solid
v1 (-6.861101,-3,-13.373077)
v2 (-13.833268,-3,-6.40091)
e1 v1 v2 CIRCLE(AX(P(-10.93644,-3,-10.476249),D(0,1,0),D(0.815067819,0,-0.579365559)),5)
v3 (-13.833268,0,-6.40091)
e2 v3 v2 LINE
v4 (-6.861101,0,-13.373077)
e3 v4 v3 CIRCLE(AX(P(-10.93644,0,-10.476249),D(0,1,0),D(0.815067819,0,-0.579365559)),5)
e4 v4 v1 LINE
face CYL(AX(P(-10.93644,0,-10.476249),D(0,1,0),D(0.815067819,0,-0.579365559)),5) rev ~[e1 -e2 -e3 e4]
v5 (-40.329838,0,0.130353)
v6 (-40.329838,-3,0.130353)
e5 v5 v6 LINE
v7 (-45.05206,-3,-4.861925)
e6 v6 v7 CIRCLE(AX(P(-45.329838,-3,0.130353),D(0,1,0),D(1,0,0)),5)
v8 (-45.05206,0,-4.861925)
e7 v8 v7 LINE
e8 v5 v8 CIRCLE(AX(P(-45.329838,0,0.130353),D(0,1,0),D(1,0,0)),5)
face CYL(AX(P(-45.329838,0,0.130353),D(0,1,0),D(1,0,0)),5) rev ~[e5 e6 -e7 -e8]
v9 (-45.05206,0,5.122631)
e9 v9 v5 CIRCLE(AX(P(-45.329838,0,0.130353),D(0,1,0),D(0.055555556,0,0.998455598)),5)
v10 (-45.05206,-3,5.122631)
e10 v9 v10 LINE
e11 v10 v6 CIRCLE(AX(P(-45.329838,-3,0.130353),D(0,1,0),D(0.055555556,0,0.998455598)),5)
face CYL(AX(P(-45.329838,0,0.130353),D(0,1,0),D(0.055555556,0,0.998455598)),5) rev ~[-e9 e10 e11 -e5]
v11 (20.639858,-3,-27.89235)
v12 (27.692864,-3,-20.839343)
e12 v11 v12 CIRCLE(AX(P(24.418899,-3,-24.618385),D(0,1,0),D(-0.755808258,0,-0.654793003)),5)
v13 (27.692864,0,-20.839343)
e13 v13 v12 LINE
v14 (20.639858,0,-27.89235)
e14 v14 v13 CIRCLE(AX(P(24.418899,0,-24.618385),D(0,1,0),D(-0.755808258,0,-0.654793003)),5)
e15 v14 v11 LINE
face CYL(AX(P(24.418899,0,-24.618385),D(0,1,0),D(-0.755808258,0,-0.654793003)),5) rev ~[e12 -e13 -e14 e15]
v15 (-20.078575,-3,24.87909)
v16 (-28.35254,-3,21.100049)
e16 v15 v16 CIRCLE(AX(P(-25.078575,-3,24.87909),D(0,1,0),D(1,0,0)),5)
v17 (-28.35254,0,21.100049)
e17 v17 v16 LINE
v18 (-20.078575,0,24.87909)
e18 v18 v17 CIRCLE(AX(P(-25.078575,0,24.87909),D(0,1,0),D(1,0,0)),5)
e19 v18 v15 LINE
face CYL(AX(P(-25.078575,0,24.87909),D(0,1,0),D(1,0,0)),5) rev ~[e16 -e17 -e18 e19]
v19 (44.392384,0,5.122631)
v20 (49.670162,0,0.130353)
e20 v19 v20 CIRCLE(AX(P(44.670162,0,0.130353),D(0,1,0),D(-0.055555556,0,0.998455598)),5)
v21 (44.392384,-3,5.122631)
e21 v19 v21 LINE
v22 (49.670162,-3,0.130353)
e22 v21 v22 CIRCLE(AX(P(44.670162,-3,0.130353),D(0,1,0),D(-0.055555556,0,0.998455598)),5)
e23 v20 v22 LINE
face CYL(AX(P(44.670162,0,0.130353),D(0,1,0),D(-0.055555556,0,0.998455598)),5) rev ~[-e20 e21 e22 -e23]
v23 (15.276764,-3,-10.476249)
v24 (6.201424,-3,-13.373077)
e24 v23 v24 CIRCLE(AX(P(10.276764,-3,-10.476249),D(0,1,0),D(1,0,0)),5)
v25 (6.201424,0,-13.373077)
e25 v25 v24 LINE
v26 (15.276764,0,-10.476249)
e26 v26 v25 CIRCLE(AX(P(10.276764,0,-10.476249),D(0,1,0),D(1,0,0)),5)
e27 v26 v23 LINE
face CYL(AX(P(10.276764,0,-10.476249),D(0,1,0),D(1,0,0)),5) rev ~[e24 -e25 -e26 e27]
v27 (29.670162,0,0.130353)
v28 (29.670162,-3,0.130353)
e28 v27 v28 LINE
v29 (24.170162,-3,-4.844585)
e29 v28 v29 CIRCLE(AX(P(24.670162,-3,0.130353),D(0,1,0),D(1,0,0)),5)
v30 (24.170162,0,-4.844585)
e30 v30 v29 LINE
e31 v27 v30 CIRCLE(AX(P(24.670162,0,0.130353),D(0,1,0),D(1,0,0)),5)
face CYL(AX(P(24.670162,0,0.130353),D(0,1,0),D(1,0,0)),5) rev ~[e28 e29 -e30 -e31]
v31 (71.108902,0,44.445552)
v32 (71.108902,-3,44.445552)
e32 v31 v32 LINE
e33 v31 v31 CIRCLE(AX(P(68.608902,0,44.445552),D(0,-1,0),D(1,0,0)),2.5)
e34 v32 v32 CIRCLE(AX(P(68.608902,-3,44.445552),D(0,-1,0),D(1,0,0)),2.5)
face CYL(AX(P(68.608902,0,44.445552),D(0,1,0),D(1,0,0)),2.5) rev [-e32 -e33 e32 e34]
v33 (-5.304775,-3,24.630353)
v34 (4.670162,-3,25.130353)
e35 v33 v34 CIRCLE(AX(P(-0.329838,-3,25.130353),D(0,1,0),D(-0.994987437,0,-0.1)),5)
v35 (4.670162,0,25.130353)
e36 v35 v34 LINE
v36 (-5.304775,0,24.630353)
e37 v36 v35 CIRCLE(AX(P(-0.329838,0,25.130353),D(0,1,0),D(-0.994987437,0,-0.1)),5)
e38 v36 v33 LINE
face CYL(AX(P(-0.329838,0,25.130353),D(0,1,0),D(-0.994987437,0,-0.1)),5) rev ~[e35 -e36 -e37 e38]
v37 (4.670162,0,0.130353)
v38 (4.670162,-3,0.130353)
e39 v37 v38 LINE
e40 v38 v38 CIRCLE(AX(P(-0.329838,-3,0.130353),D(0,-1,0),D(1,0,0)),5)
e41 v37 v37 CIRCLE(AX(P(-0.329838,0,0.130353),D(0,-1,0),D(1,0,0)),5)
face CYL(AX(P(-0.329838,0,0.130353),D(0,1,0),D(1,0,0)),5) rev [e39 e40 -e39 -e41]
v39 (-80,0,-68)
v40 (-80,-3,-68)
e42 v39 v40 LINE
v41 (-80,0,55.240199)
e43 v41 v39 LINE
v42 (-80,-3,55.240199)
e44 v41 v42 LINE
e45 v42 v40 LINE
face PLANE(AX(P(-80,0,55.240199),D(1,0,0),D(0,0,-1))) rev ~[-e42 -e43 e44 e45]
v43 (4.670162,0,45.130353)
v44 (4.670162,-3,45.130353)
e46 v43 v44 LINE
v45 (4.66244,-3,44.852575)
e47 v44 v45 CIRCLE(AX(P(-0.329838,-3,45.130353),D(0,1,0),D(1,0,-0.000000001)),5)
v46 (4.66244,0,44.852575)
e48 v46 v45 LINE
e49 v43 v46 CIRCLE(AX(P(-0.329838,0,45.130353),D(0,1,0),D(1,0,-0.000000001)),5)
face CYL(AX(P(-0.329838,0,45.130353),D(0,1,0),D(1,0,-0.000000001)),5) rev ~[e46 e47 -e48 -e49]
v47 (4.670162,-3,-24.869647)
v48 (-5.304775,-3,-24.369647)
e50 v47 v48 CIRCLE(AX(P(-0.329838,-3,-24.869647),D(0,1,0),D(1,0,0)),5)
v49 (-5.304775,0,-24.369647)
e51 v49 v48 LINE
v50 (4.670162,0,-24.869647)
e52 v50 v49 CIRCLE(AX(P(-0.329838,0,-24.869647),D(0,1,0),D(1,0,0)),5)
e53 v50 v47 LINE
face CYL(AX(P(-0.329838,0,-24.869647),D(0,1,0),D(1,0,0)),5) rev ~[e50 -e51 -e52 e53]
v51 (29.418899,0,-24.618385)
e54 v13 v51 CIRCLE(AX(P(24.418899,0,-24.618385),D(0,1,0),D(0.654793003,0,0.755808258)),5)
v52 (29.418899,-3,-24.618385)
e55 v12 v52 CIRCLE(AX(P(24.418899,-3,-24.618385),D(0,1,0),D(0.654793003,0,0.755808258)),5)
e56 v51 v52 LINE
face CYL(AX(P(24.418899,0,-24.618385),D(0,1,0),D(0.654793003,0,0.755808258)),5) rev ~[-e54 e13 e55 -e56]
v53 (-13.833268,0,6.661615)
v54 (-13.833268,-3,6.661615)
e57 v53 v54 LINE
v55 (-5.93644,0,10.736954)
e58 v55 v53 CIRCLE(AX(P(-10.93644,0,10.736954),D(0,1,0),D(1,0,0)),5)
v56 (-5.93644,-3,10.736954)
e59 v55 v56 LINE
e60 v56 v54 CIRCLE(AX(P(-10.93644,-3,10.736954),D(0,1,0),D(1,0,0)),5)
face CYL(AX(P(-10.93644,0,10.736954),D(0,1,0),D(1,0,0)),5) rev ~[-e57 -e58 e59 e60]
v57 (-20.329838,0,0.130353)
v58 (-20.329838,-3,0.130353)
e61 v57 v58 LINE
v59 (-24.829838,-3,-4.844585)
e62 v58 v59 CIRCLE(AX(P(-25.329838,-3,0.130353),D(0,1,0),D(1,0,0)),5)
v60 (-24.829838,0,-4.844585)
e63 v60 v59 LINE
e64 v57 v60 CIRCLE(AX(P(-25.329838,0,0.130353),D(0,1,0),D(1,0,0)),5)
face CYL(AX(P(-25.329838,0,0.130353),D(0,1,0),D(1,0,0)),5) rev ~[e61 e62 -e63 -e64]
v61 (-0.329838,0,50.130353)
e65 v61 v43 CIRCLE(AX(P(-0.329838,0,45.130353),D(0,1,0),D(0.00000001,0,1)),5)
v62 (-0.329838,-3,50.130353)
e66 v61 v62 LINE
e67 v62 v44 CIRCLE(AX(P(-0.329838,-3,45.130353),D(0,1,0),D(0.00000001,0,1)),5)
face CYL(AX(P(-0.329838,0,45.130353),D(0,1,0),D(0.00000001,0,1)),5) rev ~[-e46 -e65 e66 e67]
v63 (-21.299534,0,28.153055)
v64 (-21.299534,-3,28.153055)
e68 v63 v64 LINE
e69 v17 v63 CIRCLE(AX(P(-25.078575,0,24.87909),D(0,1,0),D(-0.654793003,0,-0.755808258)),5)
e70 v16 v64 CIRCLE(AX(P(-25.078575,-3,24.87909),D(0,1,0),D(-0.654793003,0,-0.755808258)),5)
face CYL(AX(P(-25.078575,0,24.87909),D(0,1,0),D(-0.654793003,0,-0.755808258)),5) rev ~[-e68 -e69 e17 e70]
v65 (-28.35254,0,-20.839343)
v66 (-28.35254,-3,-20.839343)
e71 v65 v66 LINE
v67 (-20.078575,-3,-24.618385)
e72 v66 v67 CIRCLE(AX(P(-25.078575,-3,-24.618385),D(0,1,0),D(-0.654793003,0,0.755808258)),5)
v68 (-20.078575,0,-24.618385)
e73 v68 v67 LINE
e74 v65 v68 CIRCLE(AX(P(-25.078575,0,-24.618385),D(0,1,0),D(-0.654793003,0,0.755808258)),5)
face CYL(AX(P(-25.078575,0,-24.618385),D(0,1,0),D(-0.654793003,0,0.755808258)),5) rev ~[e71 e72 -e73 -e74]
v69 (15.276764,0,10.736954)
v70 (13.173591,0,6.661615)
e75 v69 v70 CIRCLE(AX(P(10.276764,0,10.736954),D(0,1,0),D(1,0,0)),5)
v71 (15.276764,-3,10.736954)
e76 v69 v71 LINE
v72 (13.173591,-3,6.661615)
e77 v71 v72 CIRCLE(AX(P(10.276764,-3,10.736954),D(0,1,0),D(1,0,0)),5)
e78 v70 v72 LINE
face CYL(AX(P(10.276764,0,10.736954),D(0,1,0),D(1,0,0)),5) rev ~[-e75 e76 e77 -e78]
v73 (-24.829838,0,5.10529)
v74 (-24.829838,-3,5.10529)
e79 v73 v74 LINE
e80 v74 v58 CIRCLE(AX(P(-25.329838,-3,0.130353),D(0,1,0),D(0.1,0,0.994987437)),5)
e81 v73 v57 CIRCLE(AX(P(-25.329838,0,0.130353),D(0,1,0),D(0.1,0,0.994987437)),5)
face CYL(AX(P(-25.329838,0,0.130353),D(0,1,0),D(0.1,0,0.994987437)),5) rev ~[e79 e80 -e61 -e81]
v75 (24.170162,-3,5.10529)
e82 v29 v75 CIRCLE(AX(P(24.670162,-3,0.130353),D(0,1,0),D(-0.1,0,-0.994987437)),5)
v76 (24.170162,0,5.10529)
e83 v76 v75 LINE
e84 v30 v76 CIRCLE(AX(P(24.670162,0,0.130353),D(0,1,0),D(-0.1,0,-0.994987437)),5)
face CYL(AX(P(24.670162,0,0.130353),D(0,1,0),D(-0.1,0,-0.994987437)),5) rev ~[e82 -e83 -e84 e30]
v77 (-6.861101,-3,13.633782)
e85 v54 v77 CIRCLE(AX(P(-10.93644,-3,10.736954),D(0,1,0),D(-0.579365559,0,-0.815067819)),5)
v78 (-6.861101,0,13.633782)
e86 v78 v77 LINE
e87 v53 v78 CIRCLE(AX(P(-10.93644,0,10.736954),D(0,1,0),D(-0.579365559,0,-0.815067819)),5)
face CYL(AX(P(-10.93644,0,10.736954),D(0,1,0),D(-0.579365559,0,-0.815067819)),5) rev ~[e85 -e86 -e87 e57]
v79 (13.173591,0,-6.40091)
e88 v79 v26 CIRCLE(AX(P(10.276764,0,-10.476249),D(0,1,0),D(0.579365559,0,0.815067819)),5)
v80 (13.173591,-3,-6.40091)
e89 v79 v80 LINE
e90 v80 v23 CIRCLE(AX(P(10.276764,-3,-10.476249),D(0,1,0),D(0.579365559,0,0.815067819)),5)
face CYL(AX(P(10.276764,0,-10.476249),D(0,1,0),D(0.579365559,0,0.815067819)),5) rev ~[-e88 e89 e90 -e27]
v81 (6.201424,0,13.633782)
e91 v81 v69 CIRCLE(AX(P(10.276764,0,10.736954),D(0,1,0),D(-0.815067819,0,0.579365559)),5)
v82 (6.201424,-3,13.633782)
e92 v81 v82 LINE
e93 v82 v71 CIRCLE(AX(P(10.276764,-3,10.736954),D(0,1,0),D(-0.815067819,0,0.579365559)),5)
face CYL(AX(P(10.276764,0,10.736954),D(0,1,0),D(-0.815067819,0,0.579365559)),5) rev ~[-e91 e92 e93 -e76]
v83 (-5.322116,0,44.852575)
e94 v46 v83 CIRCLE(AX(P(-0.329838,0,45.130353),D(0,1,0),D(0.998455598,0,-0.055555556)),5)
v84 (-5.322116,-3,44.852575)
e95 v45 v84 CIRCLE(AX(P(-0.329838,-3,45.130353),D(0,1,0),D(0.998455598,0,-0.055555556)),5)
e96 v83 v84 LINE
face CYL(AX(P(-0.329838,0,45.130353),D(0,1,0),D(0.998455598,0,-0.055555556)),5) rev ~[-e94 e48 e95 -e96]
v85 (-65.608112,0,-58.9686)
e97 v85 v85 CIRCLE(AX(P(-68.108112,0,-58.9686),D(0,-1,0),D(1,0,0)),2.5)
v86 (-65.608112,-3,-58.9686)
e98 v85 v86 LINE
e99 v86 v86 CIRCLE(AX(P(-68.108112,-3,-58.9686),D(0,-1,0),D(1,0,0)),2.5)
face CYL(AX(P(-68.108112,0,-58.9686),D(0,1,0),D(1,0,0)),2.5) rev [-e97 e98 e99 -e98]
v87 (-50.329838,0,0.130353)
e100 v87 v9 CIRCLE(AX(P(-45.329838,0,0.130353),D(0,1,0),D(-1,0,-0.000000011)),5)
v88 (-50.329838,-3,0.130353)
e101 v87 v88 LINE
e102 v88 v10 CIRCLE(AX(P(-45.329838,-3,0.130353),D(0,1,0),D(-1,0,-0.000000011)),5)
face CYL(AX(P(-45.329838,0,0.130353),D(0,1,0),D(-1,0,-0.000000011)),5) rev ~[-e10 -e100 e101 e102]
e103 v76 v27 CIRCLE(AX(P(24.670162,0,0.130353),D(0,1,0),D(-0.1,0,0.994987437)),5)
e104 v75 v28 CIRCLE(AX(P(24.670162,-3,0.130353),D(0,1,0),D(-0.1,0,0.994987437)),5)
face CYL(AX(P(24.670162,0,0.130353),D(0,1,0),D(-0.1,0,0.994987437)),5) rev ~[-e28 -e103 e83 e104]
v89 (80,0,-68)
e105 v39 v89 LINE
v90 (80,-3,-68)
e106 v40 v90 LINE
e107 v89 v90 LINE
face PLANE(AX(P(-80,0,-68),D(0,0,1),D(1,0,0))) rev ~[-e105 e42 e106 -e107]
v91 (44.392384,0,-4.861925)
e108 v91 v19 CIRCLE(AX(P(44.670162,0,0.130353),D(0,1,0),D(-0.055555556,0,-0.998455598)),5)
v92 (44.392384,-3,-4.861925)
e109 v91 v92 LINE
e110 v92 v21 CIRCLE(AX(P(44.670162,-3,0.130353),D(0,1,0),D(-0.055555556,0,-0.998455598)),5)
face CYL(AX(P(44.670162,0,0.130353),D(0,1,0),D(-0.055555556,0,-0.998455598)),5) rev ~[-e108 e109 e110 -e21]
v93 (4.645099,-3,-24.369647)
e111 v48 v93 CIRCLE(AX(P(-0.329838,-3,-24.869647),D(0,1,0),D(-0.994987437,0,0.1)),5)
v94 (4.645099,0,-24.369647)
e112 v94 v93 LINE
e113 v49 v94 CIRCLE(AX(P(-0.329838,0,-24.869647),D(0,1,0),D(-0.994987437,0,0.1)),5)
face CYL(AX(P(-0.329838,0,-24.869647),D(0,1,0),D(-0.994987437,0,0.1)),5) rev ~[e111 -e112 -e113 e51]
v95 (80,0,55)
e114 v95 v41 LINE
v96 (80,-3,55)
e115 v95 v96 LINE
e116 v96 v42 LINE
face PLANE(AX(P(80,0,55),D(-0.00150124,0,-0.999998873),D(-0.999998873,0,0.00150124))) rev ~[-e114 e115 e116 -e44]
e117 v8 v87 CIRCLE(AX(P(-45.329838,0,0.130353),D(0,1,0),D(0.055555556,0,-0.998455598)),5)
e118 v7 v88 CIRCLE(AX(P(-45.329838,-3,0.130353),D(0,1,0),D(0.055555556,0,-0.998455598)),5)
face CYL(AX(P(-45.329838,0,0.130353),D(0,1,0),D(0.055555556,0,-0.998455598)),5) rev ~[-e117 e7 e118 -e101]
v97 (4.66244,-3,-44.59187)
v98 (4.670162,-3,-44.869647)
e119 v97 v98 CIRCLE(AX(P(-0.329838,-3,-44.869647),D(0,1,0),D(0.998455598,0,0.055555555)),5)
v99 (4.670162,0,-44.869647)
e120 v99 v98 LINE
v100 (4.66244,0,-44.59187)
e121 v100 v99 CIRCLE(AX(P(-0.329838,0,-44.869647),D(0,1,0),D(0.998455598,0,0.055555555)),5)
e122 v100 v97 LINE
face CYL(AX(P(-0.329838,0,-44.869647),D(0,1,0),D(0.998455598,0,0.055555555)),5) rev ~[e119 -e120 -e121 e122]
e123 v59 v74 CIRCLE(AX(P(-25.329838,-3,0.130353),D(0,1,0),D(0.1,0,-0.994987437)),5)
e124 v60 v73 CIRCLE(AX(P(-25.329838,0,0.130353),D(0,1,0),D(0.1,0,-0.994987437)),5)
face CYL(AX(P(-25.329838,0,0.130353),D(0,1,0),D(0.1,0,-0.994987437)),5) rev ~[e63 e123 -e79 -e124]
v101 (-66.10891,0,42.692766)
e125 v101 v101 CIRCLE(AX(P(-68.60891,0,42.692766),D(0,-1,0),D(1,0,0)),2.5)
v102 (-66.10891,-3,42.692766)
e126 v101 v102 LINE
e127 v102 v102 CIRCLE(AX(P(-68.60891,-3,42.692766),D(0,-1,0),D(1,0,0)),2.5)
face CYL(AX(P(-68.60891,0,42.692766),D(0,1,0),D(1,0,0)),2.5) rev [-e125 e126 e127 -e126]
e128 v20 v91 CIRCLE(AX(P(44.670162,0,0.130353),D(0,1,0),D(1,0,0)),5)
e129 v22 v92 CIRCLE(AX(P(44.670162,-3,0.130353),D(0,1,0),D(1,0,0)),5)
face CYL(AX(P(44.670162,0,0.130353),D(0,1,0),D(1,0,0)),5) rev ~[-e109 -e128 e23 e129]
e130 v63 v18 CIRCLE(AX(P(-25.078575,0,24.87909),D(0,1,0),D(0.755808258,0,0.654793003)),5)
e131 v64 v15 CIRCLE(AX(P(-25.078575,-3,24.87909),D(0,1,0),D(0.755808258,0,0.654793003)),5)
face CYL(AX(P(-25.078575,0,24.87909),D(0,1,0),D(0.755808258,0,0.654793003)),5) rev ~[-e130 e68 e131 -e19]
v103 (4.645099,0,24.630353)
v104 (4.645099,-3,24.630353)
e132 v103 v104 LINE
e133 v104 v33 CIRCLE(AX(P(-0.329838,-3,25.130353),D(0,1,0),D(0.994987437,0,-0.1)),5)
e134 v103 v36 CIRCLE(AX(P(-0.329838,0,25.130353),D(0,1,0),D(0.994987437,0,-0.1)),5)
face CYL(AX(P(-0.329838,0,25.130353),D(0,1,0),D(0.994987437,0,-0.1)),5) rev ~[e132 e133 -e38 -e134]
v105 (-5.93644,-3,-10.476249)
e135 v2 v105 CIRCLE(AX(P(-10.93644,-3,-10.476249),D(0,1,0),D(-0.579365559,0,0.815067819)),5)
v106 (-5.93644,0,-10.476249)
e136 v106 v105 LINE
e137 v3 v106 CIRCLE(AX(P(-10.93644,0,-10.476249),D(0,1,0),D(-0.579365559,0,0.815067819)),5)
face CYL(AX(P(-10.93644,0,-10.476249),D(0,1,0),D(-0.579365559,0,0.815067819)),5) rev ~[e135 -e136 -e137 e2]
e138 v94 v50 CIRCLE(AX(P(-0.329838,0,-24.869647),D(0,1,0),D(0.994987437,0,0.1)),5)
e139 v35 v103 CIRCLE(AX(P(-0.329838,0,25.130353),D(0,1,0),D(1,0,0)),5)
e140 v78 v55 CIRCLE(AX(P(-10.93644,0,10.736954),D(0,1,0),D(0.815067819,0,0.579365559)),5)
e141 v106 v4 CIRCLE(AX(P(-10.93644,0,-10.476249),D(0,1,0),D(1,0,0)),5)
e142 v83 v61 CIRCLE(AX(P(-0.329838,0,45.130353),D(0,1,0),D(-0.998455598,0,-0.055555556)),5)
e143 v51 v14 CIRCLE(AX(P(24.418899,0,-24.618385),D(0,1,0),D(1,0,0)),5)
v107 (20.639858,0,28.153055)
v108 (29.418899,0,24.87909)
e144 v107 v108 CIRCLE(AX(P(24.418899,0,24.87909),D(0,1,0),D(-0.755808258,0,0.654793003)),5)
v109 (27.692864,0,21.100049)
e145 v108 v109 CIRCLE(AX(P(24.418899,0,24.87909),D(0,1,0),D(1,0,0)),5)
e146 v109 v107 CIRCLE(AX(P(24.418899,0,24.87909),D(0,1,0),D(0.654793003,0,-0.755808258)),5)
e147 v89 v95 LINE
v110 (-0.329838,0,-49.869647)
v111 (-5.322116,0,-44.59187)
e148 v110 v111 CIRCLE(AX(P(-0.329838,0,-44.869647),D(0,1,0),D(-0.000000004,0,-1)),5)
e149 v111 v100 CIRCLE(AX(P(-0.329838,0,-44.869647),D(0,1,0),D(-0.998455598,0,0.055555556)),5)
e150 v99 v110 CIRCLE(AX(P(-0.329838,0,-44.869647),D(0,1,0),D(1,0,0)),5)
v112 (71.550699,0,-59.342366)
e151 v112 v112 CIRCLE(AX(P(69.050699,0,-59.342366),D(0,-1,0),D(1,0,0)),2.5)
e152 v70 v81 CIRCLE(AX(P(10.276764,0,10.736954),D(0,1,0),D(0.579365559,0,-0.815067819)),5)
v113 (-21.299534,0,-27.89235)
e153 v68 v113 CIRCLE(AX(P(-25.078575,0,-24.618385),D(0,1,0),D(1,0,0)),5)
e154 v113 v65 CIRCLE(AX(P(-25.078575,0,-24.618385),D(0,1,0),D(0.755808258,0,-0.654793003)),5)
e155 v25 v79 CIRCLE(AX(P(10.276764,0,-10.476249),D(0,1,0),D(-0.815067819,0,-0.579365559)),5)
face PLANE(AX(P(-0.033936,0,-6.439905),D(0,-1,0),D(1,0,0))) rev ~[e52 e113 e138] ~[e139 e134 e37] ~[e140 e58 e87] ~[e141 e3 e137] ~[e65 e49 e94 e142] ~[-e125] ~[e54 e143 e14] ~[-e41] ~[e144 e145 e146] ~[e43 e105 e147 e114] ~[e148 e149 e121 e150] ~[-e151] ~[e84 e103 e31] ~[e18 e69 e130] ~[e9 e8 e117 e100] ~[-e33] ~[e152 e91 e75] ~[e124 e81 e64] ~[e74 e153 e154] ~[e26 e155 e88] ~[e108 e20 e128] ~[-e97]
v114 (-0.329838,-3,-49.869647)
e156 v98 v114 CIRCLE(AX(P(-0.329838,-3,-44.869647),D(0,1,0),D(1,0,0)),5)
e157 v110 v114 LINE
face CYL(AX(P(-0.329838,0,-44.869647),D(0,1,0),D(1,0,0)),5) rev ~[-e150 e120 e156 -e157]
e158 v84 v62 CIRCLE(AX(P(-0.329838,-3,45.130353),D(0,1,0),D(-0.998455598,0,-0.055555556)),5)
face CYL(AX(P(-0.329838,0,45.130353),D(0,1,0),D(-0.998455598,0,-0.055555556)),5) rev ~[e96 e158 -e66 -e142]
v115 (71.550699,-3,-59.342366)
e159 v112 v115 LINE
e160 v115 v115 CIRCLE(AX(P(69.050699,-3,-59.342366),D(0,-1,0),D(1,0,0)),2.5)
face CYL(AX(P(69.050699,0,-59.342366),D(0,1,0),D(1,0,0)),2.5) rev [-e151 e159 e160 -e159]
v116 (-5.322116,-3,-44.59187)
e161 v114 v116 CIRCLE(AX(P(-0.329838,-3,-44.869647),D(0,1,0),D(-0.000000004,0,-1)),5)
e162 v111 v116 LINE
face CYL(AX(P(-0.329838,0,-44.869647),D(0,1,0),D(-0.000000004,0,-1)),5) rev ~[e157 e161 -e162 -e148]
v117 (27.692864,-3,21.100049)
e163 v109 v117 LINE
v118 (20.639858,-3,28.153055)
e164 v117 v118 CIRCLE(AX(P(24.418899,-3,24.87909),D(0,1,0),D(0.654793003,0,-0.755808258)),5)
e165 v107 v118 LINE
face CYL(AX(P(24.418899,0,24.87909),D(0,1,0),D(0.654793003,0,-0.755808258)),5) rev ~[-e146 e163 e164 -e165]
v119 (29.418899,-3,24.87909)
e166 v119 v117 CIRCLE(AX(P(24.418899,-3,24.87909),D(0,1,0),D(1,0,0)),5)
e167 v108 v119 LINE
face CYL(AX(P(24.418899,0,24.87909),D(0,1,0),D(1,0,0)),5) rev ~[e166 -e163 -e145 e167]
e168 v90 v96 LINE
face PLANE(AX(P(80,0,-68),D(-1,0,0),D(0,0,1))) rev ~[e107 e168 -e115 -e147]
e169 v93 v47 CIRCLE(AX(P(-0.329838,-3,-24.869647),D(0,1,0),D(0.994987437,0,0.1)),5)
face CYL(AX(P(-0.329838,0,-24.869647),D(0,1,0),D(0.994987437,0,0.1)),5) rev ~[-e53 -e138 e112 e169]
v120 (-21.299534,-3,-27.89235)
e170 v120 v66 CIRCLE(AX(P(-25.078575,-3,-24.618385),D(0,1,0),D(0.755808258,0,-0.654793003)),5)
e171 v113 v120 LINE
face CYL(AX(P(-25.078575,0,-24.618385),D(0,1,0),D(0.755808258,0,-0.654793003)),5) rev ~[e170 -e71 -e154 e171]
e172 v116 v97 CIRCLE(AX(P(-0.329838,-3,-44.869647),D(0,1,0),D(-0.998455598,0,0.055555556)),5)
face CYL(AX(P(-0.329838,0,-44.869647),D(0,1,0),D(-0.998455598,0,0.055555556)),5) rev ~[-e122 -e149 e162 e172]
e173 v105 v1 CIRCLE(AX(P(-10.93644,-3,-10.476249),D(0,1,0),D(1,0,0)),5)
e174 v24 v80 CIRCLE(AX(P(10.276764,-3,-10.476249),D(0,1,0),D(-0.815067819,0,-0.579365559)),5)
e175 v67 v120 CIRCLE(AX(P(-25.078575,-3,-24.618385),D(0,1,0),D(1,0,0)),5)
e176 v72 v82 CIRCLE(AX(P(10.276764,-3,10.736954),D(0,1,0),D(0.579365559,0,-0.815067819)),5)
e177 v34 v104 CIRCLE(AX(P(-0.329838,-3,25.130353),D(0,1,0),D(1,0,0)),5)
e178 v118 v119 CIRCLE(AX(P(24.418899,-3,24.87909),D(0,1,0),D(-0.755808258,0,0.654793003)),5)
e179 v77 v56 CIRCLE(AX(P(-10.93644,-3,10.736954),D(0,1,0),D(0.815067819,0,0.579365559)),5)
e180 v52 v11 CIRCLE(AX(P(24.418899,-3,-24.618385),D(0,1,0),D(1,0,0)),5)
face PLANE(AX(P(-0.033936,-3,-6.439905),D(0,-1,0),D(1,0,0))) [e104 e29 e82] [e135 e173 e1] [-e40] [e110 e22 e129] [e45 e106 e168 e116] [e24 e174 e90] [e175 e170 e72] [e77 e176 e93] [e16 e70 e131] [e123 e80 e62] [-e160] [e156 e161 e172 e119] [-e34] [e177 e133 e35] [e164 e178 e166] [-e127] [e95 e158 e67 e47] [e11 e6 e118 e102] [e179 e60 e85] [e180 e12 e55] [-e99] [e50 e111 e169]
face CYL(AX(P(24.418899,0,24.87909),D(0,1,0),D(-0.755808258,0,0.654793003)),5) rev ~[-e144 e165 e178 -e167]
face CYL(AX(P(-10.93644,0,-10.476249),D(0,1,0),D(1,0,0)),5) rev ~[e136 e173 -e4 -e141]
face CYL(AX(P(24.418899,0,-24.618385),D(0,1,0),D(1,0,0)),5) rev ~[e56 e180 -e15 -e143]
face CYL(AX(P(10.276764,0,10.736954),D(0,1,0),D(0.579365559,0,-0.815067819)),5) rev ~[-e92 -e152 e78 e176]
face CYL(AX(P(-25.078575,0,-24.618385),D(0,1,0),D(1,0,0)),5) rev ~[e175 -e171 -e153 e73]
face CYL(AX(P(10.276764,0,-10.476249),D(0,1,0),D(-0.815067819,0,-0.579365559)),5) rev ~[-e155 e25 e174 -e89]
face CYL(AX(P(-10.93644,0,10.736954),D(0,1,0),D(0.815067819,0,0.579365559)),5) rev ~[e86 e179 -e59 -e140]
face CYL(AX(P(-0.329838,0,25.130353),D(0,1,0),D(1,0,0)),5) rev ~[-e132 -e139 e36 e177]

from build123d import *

# Parameters (mm, degrees)
F0_R     = 2.5
F0_R_2   = 5
F1_DEPTH = 3


with BuildPart() as f1:
    # F0 (on Front) → F1 (new body)
    with BuildSketch(Plane.XZ):
        Polygon((0, -68), (80, -68), (80, 55), (-80, 55.240198642), (-80, -68), align=None)
        with Locations((-68.1081116199, -58.9685998857)):
            Circle(F0_R, mode=Mode.SUBTRACT)
        with Locations((69.0506994724, -59.3423657119)):
            Circle(F0_R, mode=Mode.SUBTRACT)
        Polygon((49.6701618657, 0.1303526806), (49.6701618657, -49.8696473194), (-0.3298381532, -49.8696473194), (-50.3298381343, -49.8696473194), (-50.3298381343, 0.130352625), (-50.3298381343, 50.1303526806), (-0.3298380849, 50.1303526806), (49.6701618657, 50.1303526806), align=None, mode=Mode.SUBTRACT)
        with Locations((-68.6089098454, 42.6927655935)):
            Circle(F0_R, mode=Mode.SUBTRACT)
        with Locations((68.6089023948, 44.4455519319)):
            Circle(F0_R, mode=Mode.SUBTRACT)
        with BuildLine():
            ThreePointArc((-45.0520603566, -4.8619253071), (-32.1496432877, -31.6894524728), (-5.322116122, -44.5918695417))
            ThreePointArc((-5.322116122, -44.5918695417), (-0.3298381343, -39.8696473194), (4.6624398533, -44.5918695417))
            ThreePointArc((4.6624398533, -44.5918695417), (31.489967019, -31.6894524728), (44.3923840879, -4.8619253071))
            ThreePointArc((44.3923840879, -4.8619253071), (39.6701618657, 0.1303526806), (44.3923840879, 5.1226306682))
            ThreePointArc((44.3923840879, 5.1226306682), (31.489967019, 31.950157834), (4.6624398533, 44.8525749028))
            ThreePointArc((4.6624398533, 44.8525749028), (-0.3298381343, 40.1303526806), (-5.322116122, 44.8525749028))
            ThreePointArc((-5.322116122, 44.8525749028), (-32.1496432877, 31.950157834), (-45.0520603566, 5.1226306682))
            ThreePointArc((-45.0520603566, 5.1226306682), (-41.6974223481, 3.5662740353), (-40.3298381343, 0.1303526806))
            ThreePointArc((-40.3298381343, 0.1303526806), (-41.6974223481, -3.3055686741), (-45.0520603566, -4.8619253071))
        make_face()
        with BuildLine():
            ThreePointArc((27.6928642243, 21.1000487327), (32.8800593553, 11.1803621251), (34.6701618657, 0.1303526806))
            ThreePointArc((34.6701618657, 0.1303526806), (32.8800593553, -10.9196567639), (27.6928642243, -20.8393433716))
            ThreePointArc((27.6928642243, -20.8393433716), (28.9669661089, -22.5411058021), (29.4188992072, -24.618384661))
            ThreePointArc((29.4188992072, -24.618384661), (26.1660101872, -29.303211576), (20.6398579178, -27.8923496781))
            ThreePointArc((20.6398579178, -27.8923496781), (-0.3298381343, -34.8696473194), (-21.2995341865, -27.8923496781))
            ThreePointArc((-21.2995341865, -27.8923496781), (-28.6141093818, -28.1539185669), (-28.352540493, -20.8393433716))
            ThreePointArc((-28.352540493, -20.8393433716), (-35.3298381343, 0.1303526806), (-28.352540493, 21.1000487327))
            ThreePointArc((-28.352540493, 21.1000487327), (-28.6141093818, 28.414623928), (-21.2995341865, 28.1530550392))
            ThreePointArc((-21.2995341865, 28.1530550392), (-0.3298381343, 35.1303526806), (20.6398579178, 28.1530550392))
            ThreePointArc((20.6398579178, 28.1530550392), (26.1660101872, 29.5639169371), (29.4188992072, 24.8790900221))
            ThreePointArc((29.4188992072, 24.8790900221), (28.9669661089, 22.8018111633), (27.6928642243, 21.1000487327))
        make_face(mode=Mode.SUBTRACT)
        with BuildLine():
            ThreePointArc((27.6928642243, -20.8393433716), (32.8800593553, -10.9196567639), (34.6701618657, 0.1303526806))
            ThreePointArc((34.6701618657, 0.1303526806), (32.8800593553, 11.1803621251), (27.6928642243, 21.1000487327))
            ThreePointArc((27.6928642243, 21.1000487327), (20.8833653012, 21.3435561162), (20.6398579178, 28.1530550392))
            ThreePointArc((20.6398579178, 28.1530550392), (-0.3298381343, 35.1303526806), (-21.2995341865, 28.1530550392))
            ThreePointArc((-21.2995341865, 28.1530550392), (-20.3937485609, 26.6262010021), (-20.0785754759, 24.8790900221))
            ThreePointArc((-20.0785754759, 24.8790900221), (-23.0012966171, 20.3310231204), (-28.352540493, 21.1000487327))
            ThreePointArc((-28.352540493, 21.1000487327), (-35.3298381343, 0.1303526806), (-28.352540493, -20.8393433716))
            ThreePointArc((-28.352540493, -20.8393433716), (-23.0012966171, -20.0703177592), (-20.0785754759, -24.618384661))
            ThreePointArc((-20.0785754759, -24.618384661), (-20.3937485609, -26.365495641), (-21.2995341865, -27.8923496781))
            ThreePointArc((-21.2995341865, -27.8923496781), (-0.3298381343, -34.8696473194), (20.6398579178, -27.8923496781))
            ThreePointArc((20.6398579178, -27.8923496781), (20.8833653012, -21.082850755), (27.6928642243, -20.8393433716))
        make_face()
        with BuildLine():
            ThreePointArc((4.6450990512, 24.6303526806), (17.3478313953, 17.8080222102), (24.1701618657, 5.1052898661))
            ThreePointArc((24.1701618657, 5.1052898661), (28.0242638319, 3.8384519241), (29.6701618657, 0.1303526806))
            ThreePointArc((29.6701618657, 0.1303526806), (28.0242638319, -3.577746563), (24.1701618657, -4.844584505))
            ThreePointArc((24.1701618657, -4.844584505), (17.3478313953, -17.5473168491), (4.6450990512, -24.3696473194))
            ThreePointArc((4.6450990512, -24.3696473194), (4.6638922312, -24.6193334441), (4.6701618657, -24.8696473194))
            ThreePointArc((4.6701618657, -24.8696473194), (-0.5801520096, -29.863377685), (-5.3047753199, -24.3696473194))
            ThreePointArc((-5.3047753199, -24.3696473194), (-18.007507664, -17.5473168491), (-24.8298381343, -4.844584505))
            ThreePointArc((-24.8298381343, -4.844584505), (-30.3298381343, 0.1303526806), (-24.8298381343, 5.1052898661))
            ThreePointArc((-24.8298381343, 5.1052898661), (-18.007507664, 17.8080222102), (-5.3047753199, 24.6303526806))
            ThreePointArc((-5.3047753199, 24.6303526806), (-0.5801520096, 30.1240830461), (4.6701618657, 25.1303526806))
            ThreePointArc((4.6701618657, 25.1303526806), (4.6638922312, 24.8800388053), (4.6450990512, 24.6303526806))
        make_face(mode=Mode.SUBTRACT)
        with BuildLine():
            ThreePointArc((24.1701618657, -4.844584505), (19.6701618657, 0.1303526806), (24.1701618657, 5.1052898661))
            ThreePointArc((24.1701618657, 5.1052898661), (17.3478313953, 17.8080222102), (4.6450990512, 24.6303526806))
            ThreePointArc((4.6450990512, 24.6303526806), (-0.3298381343, 20.1303526806), (-5.3047753199, 24.6303526806))
            ThreePointArc((-5.3047753199, 24.6303526806), (-18.007507664, 17.8080222102), (-24.8298381343, 5.1052898661))
            ThreePointArc((-24.8298381343, 5.1052898661), (-21.6217388908, 3.4844546468), (-20.3298381343, 0.1303526806))
            ThreePointArc((-20.3298381343, 0.1303526806), (-21.6217388908, -3.2237492857), (-24.8298381343, -4.844584505))
            ThreePointArc((-24.8298381343, -4.844584505), (-18.007507664, -17.5473168491), (-5.3047753199, -24.3696473194))
            ThreePointArc((-5.3047753199, -24.3696473194), (-0.3298381343, -19.8696473194), (4.6450990512, -24.3696473194))
            ThreePointArc((4.6450990512, -24.3696473194), (17.3478313953, -17.5473168491), (24.1701618657, -4.844584505))
        make_face()
        with BuildLine():
            ThreePointArc((13.1735913764, 6.6616153035), (14.2912330073, 3.4806181431), (14.6701618657, 0.1303526806))
            ThreePointArc((14.6701618657, 0.1303526806), (14.2912330073, -3.219912782), (13.1735913764, -6.4009099423))
            ThreePointArc((13.1735913764, -6.4009099423), (14.7199684496, -8.1832312619), (15.2767635834, -10.4762490372))
            ThreePointArc((15.2767635834, -10.4762490372), (11.7971754562, -15.2394777465), (6.2014244886, -13.3730768301))
            ThreePointArc((6.2014244886, -13.3730768301), (-0.3298381343, -14.8696473194), (-6.8611007573, -13.3730768301))
            ThreePointArc((-6.8611007573, -13.3730768301), (-14.4719737581, -14.0117829432), (-13.833267645, -6.4009099423))
            ThreePointArc((-13.833267645, -6.4009099423), (-15.3298381343, 0.1303526806), (-13.833267645, 6.6616153035))
            ThreePointArc((-13.833267645, 6.6616153035), (-14.4719737581, 14.2724883043), (-6.8611007573, 13.6337821913))
            ThreePointArc((-6.8611007573, 13.6337821913), (-0.3298381343, 15.1303526806), (6.2014244886, 13.6337821913))
            ThreePointArc((6.2014244886, 13.6337821913), (11.7971754562, 15.5001831077), (15.2767635834, 10.7369543984))
            ThreePointArc((15.2767635834, 10.7369543984), (14.7199684496, 8.4439366231), (13.1735913764, 6.6616153035))
        make_face(mode=Mode.SUBTRACT)
        with BuildLine():
            Line((-0.3298381532, -49.8696473194), (49.6701618657, -49.8696473194))
            Line((49.6701618657, -49.8696473194), (49.6701618657, 0.1303526806))
            ThreePointArc((49.6701618657, 0.1303526806), (48.1060832203, -3.5020631057), (44.3923840879, -4.8619253071))
            ThreePointArc((44.3923840879, -4.8619253071), (31.489967019, -31.6894524728), (4.6624398533, -44.5918695417))
            ThreePointArc((4.6624398533, -44.5918695417), (4.6682309897, -44.7307047744), (4.6701618657, -44.8696473194))
            ThreePointArc((4.6701618657, -44.8696473194), (3.2056957649, -48.405181232), (-0.3298381532, -49.8696473194))
        make_face()
        with BuildLine():
            Line((-50.3298381343, -49.8696473194), (-0.3298381532, -49.8696473194))
            ThreePointArc((-0.3298381532, -49.8696473194), (-3.9622539271, -48.3055686673), (-5.322116122, -44.5918695417))
            ThreePointArc((-5.322116122, -44.5918695417), (-32.1496432877, -31.6894524728), (-45.0520603566, -4.8619253071))
            ThreePointArc((-45.0520603566, -4.8619253071), (-48.7657594688, -3.5020631248), (-50.3298381343, 0.130352625))
            Line((-50.3298381343, 0.130352625), (-50.3298381343, -49.8696473194))
        make_face()
        with BuildLine():
            ThreePointArc((44.3923840879, 5.1226306682), (48.1060832203, 3.7627684669), (49.6701618657, 0.1303526806))
            Line((49.6701618657, 0.1303526806), (49.6701618657, 50.1303526806))
            Line((49.6701618657, 50.1303526806), (-0.3298380849, 50.1303526806))
            ThreePointArc((-0.3298380849, 50.1303526806), (3.205695789, 48.665886569), (4.6701618657, 45.1303526806))
            ThreePointArc((4.6701618657, 45.1303526806), (4.6682309897, 44.9914101355), (4.6624398533, 44.8525749028))
            ThreePointArc((4.6624398533, 44.8525749028), (31.489967019, 31.950157834), (44.3923840879, 5.1226306682))
        make_face()
        with BuildLine():
            Line((-50.3298381343, 50.1303526806), (-50.3298381343, 0.130352625))
            ThreePointArc((-50.3298381343, 0.130352625), (-48.7657595092, 3.7627684478), (-45.0520603566, 5.1226306682))
            ThreePointArc((-45.0520603566, 5.1226306682), (-32.1496432877, 31.950157834), (-5.322116122, 44.8525749028))
            ThreePointArc((-5.322116122, 44.8525749028), (-3.9622539037, 48.5662740532), (-0.3298380849, 50.1303526806))
            Line((-0.3298380849, 50.1303526806), (-50.3298381343, 50.1303526806))
        make_face()
        with BuildLine():
            ThreePointArc((13.1735913764, -6.4009099423), (14.2912330073, -3.219912782), (14.6701618657, 0.1303526806))
            ThreePointArc((14.6701618657, 0.1303526806), (14.2912330073, 3.4806181431), (13.1735913764, 6.6616153035))
            ThreePointArc((13.1735913764, 6.6616153035), (6.7412296775, 7.2014204924), (6.2014244886, 13.6337821913))
            ThreePointArc((6.2014244886, 13.6337821913), (-0.3298381343, 15.1303526806), (-6.8611007573, 13.6337821913))
            ThreePointArc((-6.8611007573, 13.6337821913), (-6.1732111428, 12.2573662711), (-5.9364398521, 10.7369543984))
            ThreePointArc((-5.9364398521, 10.7369543984), (-8.6434220769, 6.2937495323), (-13.833267645, 6.6616153035))
            ThreePointArc((-13.833267645, 6.6616153035), (-15.3298381343, 0.1303526806), (-13.833267645, -6.4009099423))
            ThreePointArc((-13.833267645, -6.4009099423), (-8.6434220769, -6.0330441711), (-5.9364398521, -10.4762490372))
            ThreePointArc((-5.9364398521, -10.4762490372), (-6.1732111428, -11.99666091), (-6.8611007573, -13.3730768301))
            ThreePointArc((-6.8611007573, -13.3730768301), (-0.3298381343, -14.8696473194), (6.2014244886, -13.3730768301))
            ThreePointArc((6.2014244886, -13.3730768301), (6.7412296775, -6.9407151313), (13.1735913764, -6.4009099423))
        make_face()
        with Locations((-0.3298381343, 0.1303526806)):
            Circle(F0_R_2, mode=Mode.SUBTRACT)
    extrude(amount=F1_DEPTH)


solid = f1.part
